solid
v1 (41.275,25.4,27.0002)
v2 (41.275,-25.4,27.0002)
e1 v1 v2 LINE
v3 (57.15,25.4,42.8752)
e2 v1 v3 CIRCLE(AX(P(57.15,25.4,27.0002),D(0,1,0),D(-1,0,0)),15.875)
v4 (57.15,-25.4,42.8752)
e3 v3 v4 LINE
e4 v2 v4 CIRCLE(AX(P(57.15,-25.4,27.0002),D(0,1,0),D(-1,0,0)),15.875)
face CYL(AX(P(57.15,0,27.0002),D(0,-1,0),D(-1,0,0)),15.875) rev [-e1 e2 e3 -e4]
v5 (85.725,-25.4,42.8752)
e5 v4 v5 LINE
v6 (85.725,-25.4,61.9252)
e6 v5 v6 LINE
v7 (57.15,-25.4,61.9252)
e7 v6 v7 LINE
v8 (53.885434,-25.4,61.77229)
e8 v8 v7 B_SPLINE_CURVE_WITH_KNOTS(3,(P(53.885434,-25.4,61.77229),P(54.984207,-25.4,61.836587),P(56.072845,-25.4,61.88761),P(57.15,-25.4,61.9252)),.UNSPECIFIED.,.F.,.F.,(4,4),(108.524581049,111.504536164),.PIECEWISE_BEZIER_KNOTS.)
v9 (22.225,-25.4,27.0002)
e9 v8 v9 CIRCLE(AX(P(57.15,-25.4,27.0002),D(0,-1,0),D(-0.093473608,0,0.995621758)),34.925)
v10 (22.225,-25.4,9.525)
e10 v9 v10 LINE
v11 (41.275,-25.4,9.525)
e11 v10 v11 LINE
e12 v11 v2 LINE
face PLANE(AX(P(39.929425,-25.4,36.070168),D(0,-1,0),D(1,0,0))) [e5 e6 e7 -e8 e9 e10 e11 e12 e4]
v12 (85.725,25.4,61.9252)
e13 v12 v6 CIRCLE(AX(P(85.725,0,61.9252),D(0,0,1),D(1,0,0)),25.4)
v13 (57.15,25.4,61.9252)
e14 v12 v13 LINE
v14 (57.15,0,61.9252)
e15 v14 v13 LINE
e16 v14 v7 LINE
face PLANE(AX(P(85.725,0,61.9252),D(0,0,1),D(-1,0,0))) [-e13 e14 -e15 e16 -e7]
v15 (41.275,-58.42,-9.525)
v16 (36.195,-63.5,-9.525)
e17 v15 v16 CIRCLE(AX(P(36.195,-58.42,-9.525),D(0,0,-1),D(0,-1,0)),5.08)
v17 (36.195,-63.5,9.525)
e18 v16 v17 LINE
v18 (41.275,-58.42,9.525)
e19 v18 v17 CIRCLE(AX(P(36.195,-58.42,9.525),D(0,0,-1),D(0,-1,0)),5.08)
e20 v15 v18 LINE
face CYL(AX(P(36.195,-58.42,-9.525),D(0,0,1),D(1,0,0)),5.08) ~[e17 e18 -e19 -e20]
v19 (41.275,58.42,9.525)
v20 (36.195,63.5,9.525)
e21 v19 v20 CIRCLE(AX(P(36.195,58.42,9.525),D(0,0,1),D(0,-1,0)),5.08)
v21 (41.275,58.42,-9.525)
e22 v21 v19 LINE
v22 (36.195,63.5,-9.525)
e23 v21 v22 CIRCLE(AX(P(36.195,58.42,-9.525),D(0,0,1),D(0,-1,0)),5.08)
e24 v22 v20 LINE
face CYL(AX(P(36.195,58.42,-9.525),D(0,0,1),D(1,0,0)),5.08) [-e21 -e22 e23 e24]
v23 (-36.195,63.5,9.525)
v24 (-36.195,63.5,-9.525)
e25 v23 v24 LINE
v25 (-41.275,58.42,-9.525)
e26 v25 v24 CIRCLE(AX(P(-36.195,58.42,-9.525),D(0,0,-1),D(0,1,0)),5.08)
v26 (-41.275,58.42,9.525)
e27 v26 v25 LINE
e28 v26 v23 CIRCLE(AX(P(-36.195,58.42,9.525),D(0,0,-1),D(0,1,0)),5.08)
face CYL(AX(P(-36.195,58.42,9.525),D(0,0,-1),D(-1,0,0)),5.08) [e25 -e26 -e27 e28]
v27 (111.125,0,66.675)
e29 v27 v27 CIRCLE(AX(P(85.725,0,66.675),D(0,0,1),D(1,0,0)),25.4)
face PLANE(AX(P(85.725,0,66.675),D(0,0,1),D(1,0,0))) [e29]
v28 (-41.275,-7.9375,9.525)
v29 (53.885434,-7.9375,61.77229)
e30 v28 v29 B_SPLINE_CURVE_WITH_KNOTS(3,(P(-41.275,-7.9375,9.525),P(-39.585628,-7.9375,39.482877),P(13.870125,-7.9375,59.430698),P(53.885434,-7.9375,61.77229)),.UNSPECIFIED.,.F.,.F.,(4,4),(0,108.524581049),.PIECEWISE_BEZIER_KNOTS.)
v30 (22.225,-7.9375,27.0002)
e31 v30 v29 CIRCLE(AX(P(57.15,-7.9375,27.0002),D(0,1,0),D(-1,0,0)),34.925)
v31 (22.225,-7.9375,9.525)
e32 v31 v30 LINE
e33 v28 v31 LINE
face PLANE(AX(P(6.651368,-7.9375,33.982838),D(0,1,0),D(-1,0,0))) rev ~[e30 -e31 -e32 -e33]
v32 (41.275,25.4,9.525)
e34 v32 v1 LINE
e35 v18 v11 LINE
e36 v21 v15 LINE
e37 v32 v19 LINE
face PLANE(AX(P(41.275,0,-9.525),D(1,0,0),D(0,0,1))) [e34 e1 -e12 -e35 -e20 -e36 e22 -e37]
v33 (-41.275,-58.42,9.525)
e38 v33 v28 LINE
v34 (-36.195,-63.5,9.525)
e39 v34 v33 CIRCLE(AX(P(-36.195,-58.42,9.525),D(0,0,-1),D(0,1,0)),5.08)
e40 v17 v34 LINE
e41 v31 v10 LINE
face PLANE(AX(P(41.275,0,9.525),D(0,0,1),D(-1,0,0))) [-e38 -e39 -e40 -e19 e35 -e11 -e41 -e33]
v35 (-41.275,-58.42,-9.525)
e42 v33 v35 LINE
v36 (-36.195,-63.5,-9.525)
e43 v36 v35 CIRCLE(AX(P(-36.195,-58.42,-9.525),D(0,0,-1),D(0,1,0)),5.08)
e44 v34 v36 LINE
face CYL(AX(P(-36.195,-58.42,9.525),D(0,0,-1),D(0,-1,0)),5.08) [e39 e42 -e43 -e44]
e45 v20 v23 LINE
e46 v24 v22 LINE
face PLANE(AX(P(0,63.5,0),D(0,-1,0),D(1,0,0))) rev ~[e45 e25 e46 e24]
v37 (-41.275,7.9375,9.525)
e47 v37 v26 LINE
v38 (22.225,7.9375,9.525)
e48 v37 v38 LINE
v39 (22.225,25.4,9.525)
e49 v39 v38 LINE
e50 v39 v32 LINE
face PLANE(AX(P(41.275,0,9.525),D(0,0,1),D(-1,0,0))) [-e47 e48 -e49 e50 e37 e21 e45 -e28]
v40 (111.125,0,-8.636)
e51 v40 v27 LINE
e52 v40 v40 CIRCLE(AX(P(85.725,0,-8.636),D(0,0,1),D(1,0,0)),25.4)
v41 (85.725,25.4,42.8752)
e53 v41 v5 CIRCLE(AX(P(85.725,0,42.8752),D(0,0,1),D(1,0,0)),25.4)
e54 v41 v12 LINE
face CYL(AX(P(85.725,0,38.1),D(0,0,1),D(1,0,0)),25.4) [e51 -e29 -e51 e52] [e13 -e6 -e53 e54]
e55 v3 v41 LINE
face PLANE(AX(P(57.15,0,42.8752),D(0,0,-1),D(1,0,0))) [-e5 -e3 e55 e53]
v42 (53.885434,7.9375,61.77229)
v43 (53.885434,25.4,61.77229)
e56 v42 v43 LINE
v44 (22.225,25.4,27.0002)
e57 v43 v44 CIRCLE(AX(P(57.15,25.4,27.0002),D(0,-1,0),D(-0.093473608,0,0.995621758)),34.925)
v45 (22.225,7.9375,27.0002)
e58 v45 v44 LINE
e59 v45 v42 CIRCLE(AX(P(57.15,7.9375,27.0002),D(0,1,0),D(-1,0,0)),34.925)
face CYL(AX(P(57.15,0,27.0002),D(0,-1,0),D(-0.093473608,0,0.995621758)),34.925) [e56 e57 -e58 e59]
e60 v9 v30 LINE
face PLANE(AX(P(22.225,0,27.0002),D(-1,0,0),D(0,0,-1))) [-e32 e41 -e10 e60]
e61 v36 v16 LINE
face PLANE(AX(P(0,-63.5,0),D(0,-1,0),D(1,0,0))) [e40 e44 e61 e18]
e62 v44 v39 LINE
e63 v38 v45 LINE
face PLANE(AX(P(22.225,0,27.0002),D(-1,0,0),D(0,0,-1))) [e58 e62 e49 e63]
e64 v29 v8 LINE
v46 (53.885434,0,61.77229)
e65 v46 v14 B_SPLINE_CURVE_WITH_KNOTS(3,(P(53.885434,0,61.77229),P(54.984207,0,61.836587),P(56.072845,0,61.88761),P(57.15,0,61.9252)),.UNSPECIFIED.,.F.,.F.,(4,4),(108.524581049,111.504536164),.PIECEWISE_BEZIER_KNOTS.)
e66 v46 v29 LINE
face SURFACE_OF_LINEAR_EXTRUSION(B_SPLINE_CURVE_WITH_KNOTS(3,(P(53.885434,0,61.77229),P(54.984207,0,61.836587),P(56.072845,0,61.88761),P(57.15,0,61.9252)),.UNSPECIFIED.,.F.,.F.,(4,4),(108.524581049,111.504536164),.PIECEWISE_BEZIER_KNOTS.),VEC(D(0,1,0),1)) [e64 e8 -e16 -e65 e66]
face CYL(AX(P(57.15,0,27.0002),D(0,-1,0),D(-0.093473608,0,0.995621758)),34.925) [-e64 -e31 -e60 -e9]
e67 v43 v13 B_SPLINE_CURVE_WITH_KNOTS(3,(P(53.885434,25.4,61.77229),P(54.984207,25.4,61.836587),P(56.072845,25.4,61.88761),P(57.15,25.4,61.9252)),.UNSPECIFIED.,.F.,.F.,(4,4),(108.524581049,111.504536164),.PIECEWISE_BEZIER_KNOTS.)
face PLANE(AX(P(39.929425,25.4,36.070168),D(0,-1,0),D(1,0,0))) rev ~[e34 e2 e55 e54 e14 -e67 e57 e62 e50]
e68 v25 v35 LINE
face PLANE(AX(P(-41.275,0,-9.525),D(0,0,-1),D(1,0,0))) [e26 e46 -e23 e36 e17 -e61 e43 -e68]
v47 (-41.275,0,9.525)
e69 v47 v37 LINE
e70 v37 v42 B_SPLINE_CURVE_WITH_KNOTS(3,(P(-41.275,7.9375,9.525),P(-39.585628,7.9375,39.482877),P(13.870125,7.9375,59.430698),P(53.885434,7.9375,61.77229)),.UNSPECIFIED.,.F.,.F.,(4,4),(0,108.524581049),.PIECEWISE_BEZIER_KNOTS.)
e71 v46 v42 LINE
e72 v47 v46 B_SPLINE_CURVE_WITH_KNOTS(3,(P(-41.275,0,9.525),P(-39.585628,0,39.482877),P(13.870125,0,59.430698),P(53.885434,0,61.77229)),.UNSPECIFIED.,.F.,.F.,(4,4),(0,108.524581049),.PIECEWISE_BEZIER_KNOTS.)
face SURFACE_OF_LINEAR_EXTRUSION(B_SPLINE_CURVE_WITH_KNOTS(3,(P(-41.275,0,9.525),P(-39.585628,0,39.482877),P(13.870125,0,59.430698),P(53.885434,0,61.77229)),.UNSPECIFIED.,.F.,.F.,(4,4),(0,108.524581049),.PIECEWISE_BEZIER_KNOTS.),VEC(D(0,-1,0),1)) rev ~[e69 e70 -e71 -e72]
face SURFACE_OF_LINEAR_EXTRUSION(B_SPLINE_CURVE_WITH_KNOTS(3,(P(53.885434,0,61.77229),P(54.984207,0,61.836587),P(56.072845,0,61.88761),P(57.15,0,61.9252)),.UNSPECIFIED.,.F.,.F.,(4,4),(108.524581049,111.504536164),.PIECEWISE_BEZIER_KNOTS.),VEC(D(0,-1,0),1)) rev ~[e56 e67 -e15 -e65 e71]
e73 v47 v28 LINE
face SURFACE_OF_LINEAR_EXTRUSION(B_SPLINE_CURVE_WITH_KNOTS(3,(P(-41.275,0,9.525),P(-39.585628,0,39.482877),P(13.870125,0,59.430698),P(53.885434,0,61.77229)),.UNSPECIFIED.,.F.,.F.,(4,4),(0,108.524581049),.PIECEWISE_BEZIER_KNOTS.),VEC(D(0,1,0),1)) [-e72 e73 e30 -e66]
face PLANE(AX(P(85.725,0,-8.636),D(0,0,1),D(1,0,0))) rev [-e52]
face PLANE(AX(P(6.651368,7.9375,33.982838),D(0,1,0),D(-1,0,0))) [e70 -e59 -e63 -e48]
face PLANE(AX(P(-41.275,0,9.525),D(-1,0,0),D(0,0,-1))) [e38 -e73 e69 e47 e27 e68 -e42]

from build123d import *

# Parameters (mm, degrees)
F1_DEPTH = 63.5
F0_W     = 25.4
F0_H     = 19.05
F2_DEPTH = 25.4
F3_DEPTH = 7.9375
F5_R     = 5.08
F6_DEPTH = 46.736


with BuildPart() as f1:
    # F0 (on Front) → F1 (new body, symmetric)
    with BuildSketch(Plane.XZ):
        Polygon((22.225, 9.525), (-41.275, 9.525), (-41.275, -9.525), (41.275, -9.525), (41.275, 9.525), align=None)
    extrude(amount=F1_DEPTH, both=True)

    # F0 (on Front) → F2 (join, symmetric)
    with BuildSketch(Plane.XZ):
        with BuildLine():
            Line((22.225, 27.0002), (22.225, 9.525))
            Line((22.225, 9.525), (41.275, 9.525))
            Line((41.275, 9.525), (41.275, 27.0002))
            ThreePointArc((41.275, 27.0002), (45.9246798487, 38.2255201513), (57.15, 42.8752))
            Line((57.15, 42.8752), (60.325, 42.8752))
            Line((60.325, 42.8752), (60.325, 61.9252))
            Line((60.325, 61.9252), (57.15, 61.9252))
            add(Edge.make_bspline(
                [(53.8854342407, 61.7722898912), (54.9842067368, 61.8365871986), (56.0728453275, 61.8876096574), (57.15, 61.9252)],
                knots=[108.5245810491, 108.5245810491, 108.5245810491, 108.5245810491, 111.5045361635, 111.5045361635, 111.5045361635, 111.5045361635], degree=3))
            ThreePointArc((53.8854342407, 61.7722898912), (31.3258777096, 50.5133948686), (22.225, 27.0002))
        make_face()
        with Locations((73.025, 52.4002)):
            Rectangle(F0_W, F0_H)
    extrude(amount=F2_DEPTH, both=True)

    # F0 (on Front) → F3 (join, symmetric)
    with BuildSketch(Plane.XZ):
        with BuildLine():
            add(Edge.make_bspline(
                [(-41.275, 9.525), (-39.5856284224, 39.4828766469), (13.870125209, 59.4306981306), (53.8854342407, 61.7722898912)],
                knots=[0, 0, 0, 0, 108.5245810491, 108.5245810491, 108.5245810491, 108.5245810491], degree=3))
            Line((-41.275, 9.525), (22.225, 9.525))
            Line((22.225, 9.525), (22.225, 27.0002))
            ThreePointArc((22.225, 27.0002), (31.3258777096, 50.5133948686), (53.8854342407, 61.7722898912))
        make_face()
    extrude(amount=F3_DEPTH, both=True)

    # F0 (on Front) → F4 (revolve)
    with BuildSketch(Plane.XZ):
        Polygon((85.725, 66.675), (85.725, 61.9252), (85.725, 42.8752), (85.725, 38.1), (111.125, 38.1), (111.125, 66.675), align=None)
    revolve(axis=Axis((85.725, 0, 52.3875), (0, 0, 1)))

    # F5
    f5_edges = [f1.edges().sort_by_distance(p)[0] for p in [
        (41.275, -63.5, 0),
        (-41.275, -63.5, 0),
        (41.275, 63.5, 0),
        (-41.275, 63.5, 0),
    ]]
    fillet(f5_edges, radius=F5_R)

    # F6 (add): a face of the model
    f6_faces = [f1.faces().sort_by_distance(p)[0] for p in [
        (85.725, 0, 38.1),
    ]]
    extrude(f6_faces, amount=F6_DEPTH)


solid = f1.part
